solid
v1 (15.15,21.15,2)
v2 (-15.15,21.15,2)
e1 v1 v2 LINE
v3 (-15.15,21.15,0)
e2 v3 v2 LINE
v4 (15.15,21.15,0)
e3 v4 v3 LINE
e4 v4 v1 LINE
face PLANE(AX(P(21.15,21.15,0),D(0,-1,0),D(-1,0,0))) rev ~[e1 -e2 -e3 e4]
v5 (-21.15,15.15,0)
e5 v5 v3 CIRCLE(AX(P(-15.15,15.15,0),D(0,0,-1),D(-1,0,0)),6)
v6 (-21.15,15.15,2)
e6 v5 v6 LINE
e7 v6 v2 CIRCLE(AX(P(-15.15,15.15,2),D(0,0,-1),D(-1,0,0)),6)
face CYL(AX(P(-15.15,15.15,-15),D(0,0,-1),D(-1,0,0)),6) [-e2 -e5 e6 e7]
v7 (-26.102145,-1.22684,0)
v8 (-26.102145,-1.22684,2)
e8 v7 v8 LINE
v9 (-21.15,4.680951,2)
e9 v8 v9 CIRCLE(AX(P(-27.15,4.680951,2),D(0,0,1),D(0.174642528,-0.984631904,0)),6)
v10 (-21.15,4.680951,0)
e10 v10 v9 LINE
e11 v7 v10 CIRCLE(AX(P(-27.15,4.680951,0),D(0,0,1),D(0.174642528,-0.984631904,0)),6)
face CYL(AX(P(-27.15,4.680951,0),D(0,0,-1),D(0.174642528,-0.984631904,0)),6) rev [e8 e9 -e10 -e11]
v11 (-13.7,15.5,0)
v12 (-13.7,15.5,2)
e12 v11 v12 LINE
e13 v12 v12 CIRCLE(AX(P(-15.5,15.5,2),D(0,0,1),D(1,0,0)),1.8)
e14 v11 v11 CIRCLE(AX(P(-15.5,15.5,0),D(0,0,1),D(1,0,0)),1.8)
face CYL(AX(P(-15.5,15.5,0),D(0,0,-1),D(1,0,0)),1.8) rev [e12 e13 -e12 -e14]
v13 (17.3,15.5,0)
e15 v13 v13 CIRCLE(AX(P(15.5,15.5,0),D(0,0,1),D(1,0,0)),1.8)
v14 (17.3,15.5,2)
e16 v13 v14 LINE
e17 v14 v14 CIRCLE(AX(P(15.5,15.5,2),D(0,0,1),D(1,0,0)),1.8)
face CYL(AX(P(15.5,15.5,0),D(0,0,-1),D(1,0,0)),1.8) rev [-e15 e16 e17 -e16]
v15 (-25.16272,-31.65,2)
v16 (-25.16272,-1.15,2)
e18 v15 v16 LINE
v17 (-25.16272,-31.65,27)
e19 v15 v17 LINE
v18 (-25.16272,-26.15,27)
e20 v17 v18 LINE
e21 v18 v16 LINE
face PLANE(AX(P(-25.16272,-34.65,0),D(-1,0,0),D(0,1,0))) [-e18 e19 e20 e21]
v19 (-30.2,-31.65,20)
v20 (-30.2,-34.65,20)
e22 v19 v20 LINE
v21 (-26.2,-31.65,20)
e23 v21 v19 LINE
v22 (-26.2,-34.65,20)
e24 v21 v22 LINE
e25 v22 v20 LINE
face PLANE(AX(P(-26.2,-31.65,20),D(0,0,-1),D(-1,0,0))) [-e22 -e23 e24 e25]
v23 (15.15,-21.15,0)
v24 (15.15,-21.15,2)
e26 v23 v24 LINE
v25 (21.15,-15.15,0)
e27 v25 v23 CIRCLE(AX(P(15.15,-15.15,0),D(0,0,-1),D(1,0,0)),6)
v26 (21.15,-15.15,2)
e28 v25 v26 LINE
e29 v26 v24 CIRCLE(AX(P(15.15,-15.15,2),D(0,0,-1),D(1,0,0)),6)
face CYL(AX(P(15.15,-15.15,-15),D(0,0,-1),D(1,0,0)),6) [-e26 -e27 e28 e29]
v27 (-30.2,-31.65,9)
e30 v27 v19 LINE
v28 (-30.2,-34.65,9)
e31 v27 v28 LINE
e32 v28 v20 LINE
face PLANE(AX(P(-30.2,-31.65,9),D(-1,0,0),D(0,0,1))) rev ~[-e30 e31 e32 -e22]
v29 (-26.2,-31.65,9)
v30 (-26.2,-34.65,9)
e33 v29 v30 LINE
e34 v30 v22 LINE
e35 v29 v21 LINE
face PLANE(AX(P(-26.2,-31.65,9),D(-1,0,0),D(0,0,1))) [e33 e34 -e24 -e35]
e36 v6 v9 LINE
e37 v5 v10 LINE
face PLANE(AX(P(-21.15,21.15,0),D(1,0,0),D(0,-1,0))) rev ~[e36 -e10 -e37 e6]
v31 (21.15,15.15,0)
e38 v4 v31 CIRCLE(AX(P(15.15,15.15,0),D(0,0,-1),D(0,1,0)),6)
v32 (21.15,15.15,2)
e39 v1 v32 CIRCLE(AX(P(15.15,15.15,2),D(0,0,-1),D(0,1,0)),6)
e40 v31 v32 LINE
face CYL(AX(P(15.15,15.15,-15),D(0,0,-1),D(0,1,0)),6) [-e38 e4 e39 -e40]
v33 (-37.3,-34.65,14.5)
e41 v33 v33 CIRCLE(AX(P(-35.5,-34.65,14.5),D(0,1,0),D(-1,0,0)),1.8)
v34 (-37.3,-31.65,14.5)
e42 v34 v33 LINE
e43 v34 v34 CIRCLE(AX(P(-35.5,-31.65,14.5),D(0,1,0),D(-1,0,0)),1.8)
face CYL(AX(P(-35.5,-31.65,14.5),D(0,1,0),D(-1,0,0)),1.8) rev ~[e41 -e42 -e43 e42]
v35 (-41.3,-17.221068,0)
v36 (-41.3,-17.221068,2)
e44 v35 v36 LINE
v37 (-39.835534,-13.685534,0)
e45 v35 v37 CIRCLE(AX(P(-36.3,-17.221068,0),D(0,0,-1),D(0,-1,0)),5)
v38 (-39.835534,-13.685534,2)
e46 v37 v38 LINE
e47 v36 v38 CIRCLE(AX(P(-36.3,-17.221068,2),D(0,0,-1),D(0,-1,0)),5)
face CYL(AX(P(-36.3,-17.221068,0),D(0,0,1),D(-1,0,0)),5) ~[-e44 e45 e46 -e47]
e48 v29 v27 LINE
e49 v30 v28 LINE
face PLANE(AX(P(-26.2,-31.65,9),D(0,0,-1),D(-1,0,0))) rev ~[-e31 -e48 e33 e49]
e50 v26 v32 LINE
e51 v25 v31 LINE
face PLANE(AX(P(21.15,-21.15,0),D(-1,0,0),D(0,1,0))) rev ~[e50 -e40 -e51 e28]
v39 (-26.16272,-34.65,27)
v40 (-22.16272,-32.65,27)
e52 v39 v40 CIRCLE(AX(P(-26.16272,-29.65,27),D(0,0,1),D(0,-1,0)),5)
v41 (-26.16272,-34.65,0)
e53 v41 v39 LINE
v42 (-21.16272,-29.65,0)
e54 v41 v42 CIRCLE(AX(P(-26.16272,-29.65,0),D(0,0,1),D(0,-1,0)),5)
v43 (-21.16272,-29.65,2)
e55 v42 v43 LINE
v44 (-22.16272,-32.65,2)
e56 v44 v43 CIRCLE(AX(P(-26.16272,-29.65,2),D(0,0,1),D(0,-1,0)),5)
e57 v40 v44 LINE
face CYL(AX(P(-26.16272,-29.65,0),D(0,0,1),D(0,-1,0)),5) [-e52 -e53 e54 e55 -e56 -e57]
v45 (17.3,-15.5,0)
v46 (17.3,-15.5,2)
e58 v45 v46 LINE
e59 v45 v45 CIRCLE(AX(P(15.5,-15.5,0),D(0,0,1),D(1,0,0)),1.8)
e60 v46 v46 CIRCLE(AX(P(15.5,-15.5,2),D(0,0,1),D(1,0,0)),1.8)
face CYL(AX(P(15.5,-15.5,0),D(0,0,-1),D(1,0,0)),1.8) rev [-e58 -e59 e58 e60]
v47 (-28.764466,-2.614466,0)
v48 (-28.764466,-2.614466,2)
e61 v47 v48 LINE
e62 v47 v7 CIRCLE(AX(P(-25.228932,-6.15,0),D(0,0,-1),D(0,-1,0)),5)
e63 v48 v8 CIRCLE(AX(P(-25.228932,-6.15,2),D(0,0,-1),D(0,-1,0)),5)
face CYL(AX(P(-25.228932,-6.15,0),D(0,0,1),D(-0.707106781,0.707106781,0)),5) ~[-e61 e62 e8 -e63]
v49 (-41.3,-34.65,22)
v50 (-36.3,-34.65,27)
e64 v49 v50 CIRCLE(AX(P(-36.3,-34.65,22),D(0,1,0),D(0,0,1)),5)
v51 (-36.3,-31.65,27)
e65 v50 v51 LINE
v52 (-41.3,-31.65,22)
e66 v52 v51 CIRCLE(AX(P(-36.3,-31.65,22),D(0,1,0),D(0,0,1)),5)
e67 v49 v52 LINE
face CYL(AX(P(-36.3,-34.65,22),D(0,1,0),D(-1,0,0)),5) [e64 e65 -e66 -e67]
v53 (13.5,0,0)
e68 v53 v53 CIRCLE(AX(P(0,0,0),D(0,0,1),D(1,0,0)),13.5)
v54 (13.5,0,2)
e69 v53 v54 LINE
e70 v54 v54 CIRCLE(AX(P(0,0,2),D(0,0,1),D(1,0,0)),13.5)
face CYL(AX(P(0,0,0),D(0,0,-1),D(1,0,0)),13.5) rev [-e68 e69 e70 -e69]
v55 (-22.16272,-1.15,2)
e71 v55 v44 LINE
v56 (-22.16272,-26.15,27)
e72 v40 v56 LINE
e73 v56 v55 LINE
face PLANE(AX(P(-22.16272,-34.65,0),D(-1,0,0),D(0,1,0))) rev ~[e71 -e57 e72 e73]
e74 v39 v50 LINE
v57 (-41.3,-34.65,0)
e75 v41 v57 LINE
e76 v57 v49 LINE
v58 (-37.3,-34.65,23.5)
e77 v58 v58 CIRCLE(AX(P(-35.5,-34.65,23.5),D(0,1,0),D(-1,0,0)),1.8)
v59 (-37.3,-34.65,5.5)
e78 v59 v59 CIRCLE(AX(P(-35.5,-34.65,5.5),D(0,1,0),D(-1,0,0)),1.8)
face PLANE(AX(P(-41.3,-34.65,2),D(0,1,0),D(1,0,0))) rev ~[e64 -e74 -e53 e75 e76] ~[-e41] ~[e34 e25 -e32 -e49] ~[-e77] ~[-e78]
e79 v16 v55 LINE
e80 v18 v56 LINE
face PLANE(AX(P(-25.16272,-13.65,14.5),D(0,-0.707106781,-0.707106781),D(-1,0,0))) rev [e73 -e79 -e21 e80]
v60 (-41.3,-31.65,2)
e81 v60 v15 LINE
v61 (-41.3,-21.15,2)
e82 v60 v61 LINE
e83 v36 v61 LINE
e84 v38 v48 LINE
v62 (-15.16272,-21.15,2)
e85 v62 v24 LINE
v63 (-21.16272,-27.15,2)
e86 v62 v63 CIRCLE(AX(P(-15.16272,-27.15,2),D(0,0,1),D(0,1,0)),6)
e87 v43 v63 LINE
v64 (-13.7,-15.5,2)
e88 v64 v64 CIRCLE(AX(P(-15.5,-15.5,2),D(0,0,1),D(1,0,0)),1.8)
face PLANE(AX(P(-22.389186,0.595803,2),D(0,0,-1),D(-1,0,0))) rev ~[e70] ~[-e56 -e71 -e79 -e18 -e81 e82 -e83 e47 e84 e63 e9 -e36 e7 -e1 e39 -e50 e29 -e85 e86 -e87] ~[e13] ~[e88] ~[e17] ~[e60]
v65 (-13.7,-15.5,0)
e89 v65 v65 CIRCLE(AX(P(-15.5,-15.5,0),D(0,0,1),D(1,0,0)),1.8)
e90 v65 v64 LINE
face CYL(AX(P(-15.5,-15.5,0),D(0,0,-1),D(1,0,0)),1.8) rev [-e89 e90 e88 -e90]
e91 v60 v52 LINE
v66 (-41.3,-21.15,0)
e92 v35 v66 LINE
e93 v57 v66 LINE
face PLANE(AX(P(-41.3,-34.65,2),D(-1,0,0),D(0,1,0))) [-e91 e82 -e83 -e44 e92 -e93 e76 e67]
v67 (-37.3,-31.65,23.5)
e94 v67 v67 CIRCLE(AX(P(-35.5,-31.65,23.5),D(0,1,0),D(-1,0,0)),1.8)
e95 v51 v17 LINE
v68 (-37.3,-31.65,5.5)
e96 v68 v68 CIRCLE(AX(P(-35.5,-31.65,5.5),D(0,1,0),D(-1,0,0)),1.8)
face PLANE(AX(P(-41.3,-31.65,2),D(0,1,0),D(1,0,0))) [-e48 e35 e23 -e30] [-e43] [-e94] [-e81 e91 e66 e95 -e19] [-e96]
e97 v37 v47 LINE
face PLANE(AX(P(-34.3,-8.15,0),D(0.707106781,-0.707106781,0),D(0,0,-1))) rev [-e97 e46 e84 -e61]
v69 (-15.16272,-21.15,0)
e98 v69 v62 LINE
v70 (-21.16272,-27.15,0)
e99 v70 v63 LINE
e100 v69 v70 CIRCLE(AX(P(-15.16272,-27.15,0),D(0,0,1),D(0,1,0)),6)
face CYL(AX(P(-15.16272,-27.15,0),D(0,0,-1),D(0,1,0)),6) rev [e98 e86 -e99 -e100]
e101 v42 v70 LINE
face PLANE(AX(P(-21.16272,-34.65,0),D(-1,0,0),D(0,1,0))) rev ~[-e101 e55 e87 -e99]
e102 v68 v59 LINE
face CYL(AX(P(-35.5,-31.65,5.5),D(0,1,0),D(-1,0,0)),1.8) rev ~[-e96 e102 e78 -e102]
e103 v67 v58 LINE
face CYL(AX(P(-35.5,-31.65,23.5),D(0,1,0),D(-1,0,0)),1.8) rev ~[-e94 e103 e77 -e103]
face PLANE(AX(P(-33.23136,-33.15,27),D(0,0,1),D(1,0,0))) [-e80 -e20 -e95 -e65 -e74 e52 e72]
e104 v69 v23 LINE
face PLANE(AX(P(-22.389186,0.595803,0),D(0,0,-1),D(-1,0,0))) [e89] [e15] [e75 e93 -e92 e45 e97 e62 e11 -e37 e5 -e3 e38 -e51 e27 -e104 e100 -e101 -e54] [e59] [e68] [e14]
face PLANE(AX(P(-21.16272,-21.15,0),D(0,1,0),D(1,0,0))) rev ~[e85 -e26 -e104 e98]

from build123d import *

# Parameters (mm, degrees)
F0_R         = 1.8
F0_R_2       = 13.5
F0_W         = 20.1372796029
F0_H         = 13.5
F1_DEPTH     = 2
F2_W         = 3
F2_H         = 33.5
F3_DEPTH     = 27
F4_W         = 16.1372796029
F4_H         = 3
F5_DEPTH     = 25
F6_R         = 1.8
F6_W         = 4
F6_H         = 11
F7_DEPTH     = 25
F8_SIZE      = 25
F9_SIZE      = 14
F10_R        = 5
F11_T1_DEPTH = 2
F11_T3_DEPTH = 32


# Not quite as in the source:
# - a fillet or chamfer that OpenCascade refuses, or shapes differently, is made with other operations: its cross-section is extruded or revolved along the edge and cut away or added


with BuildPart() as f1:
    # F0 (on Top) → F1 (new body)
    with BuildSketch(Plane.XY):
        Polygon((21.15, -21.15), (21.15, 21.15), (-21.15, 21.15), (-21.15, -1.15), (-21.15, -21.15), align=None)
        with Locations((-15.5, -15.5)):
            Circle(F0_R, mode=Mode.SUBTRACT)
        with Locations((15.5, -15.5)):
            Circle(F0_R, mode=Mode.SUBTRACT)
        with Locations((-15.5, 15.5)):
            Circle(F0_R, mode=Mode.SUBTRACT)
        Circle(F0_R_2, mode=Mode.SUBTRACT)
        with Locations((15.5, 15.5)):
            Circle(F0_R, mode=Mode.SUBTRACT)
        Polygon((-21.15, -21.15), (-21.15, -1.15), (-41.3, -1.15), (-41.3, -21.15), (-21.1627203971, -21.15), align=None)
        with Locations((-31.2313601986, -27.9)):
            Rectangle(F0_W, F0_H)
    extrude(amount=F1_DEPTH)

    # F2 (on Top) → F3 (join)
    with BuildSketch(Plane.XY):
        with Locations((-23.6627203971, -17.9)):
            Rectangle(F2_W, F2_H)
    extrude(amount=F3_DEPTH)

    # F4 (on face) → F5 (join)
    with BuildSketch(Plane.XY.offset(2)):
        with Locations((-33.2313601986, -33.15)):
            Rectangle(F4_W, F4_H)
    extrude(amount=F5_DEPTH)

    # F6 (on face) → F7 (cut)
    with BuildSketch(Plane(origin=(0, -31.65, 0), x_dir=(-1, 0, 0), z_dir=(0, 1, 0))):
        with Locations((35.5, 14.5)):
            Circle(F6_R)
        with Locations((35.5, 5.5)):
            Circle(F6_R)
        with Locations((35.5, 23.5)):
            Circle(F6_R)
        with Locations((28.2, 14.5)):
            Rectangle(F6_W, F6_H)
    extrude(amount=-F7_DEPTH, mode=Mode.SUBTRACT)

    # F8
    f8_edges = [f1.edges().sort_by_distance(p)[0] for p in [
        (-23.66272, -1.15, 27),
    ]]
    chamfer(f8_edges, length=F8_SIZE)

    # F9
    f9_edges = [f1.edges().sort_by_distance(p)[0] for p in [
        (-41.3, -1.15, 1),
    ]]
    chamfer(f9_edges, length=F9_SIZE)

    # F10
    f10_edges = [f1.edges().sort_by_distance(p)[0] for p in [
        (-41.3, -15.15, 1),
        (-27.3, -1.15, 1),
        (-21.16272, -34.65, 1),
        (-41.3, -33.15, 27),
    ]]
    fillet(f10_edges, radius=F10_R)

    # F11: fillet of radius 6 on 5 edges, made by hand

    # F11_s2 → F11_t1 (join)
    with BuildSketch(Plane.XY):
        with BuildLine():
            ThreePointArc((-26.1021448299, -1.2268404777), (-22.5517867046, 0.826546392), (-21.15, 4.6809509491))
            Line((-21.15, 4.6809509491), (-20.55, 4.6809509491))
            Line((-20.55, 4.6809509491), (-20.55, -1.15))
            Line((-20.55, -1.15), (-21.15, -1.75))
            ThreePointArc((-21.15, -1.75), (-25.2289321881, -1.75), (-25.9973593129, -1.8176196204))
            Line((-25.9973593129, -1.8176196204), (-26.1021448299, -1.2268404777))
        make_face()
        with BuildLine():
            ThreePointArc((-15.1627203971, -21.15), (-19.4053610842, -22.9073593129), (-21.1627203971, -27.15))
            Line((-21.1627203971, -27.15), (-21.1627203971, -21.15))
            Line((-21.1627203971, -21.15), (-15.1627203971, -21.15))
        make_face()
    extrude(amount=F11_T1_DEPTH)

    # F11_s4 → F11_t3 (cut)
    with BuildSketch(Plane.XY.offset(-15)):
        with BuildLine():
            ThreePointArc((21.15, -15.15), (19.3926406871, -19.3926406871), (15.15, -21.15))
            Line((15.15, -21.15), (21.15, -21.15))
            Line((21.15, -21.15), (21.15, -15.15))
        make_face()
        with BuildLine():
            ThreePointArc((15.15, 21.15), (19.3926406871, 19.3926406871), (21.15, 15.15))
            Line((21.15, 15.15), (21.15, 21.15))
            Line((21.15, 21.15), (15.15, 21.15))
        make_face()
        with BuildLine():
            ThreePointArc((-21.15, 15.15), (-19.3926406871, 19.3926406871), (-15.15, 21.15))
            Line((-15.15, 21.15), (-21.15, 21.15))
            Line((-21.15, 21.15), (-21.15, 15.15))
        make_face()
    extrude(amount=F11_T3_DEPTH, mode=Mode.SUBTRACT)


solid = f1.part
